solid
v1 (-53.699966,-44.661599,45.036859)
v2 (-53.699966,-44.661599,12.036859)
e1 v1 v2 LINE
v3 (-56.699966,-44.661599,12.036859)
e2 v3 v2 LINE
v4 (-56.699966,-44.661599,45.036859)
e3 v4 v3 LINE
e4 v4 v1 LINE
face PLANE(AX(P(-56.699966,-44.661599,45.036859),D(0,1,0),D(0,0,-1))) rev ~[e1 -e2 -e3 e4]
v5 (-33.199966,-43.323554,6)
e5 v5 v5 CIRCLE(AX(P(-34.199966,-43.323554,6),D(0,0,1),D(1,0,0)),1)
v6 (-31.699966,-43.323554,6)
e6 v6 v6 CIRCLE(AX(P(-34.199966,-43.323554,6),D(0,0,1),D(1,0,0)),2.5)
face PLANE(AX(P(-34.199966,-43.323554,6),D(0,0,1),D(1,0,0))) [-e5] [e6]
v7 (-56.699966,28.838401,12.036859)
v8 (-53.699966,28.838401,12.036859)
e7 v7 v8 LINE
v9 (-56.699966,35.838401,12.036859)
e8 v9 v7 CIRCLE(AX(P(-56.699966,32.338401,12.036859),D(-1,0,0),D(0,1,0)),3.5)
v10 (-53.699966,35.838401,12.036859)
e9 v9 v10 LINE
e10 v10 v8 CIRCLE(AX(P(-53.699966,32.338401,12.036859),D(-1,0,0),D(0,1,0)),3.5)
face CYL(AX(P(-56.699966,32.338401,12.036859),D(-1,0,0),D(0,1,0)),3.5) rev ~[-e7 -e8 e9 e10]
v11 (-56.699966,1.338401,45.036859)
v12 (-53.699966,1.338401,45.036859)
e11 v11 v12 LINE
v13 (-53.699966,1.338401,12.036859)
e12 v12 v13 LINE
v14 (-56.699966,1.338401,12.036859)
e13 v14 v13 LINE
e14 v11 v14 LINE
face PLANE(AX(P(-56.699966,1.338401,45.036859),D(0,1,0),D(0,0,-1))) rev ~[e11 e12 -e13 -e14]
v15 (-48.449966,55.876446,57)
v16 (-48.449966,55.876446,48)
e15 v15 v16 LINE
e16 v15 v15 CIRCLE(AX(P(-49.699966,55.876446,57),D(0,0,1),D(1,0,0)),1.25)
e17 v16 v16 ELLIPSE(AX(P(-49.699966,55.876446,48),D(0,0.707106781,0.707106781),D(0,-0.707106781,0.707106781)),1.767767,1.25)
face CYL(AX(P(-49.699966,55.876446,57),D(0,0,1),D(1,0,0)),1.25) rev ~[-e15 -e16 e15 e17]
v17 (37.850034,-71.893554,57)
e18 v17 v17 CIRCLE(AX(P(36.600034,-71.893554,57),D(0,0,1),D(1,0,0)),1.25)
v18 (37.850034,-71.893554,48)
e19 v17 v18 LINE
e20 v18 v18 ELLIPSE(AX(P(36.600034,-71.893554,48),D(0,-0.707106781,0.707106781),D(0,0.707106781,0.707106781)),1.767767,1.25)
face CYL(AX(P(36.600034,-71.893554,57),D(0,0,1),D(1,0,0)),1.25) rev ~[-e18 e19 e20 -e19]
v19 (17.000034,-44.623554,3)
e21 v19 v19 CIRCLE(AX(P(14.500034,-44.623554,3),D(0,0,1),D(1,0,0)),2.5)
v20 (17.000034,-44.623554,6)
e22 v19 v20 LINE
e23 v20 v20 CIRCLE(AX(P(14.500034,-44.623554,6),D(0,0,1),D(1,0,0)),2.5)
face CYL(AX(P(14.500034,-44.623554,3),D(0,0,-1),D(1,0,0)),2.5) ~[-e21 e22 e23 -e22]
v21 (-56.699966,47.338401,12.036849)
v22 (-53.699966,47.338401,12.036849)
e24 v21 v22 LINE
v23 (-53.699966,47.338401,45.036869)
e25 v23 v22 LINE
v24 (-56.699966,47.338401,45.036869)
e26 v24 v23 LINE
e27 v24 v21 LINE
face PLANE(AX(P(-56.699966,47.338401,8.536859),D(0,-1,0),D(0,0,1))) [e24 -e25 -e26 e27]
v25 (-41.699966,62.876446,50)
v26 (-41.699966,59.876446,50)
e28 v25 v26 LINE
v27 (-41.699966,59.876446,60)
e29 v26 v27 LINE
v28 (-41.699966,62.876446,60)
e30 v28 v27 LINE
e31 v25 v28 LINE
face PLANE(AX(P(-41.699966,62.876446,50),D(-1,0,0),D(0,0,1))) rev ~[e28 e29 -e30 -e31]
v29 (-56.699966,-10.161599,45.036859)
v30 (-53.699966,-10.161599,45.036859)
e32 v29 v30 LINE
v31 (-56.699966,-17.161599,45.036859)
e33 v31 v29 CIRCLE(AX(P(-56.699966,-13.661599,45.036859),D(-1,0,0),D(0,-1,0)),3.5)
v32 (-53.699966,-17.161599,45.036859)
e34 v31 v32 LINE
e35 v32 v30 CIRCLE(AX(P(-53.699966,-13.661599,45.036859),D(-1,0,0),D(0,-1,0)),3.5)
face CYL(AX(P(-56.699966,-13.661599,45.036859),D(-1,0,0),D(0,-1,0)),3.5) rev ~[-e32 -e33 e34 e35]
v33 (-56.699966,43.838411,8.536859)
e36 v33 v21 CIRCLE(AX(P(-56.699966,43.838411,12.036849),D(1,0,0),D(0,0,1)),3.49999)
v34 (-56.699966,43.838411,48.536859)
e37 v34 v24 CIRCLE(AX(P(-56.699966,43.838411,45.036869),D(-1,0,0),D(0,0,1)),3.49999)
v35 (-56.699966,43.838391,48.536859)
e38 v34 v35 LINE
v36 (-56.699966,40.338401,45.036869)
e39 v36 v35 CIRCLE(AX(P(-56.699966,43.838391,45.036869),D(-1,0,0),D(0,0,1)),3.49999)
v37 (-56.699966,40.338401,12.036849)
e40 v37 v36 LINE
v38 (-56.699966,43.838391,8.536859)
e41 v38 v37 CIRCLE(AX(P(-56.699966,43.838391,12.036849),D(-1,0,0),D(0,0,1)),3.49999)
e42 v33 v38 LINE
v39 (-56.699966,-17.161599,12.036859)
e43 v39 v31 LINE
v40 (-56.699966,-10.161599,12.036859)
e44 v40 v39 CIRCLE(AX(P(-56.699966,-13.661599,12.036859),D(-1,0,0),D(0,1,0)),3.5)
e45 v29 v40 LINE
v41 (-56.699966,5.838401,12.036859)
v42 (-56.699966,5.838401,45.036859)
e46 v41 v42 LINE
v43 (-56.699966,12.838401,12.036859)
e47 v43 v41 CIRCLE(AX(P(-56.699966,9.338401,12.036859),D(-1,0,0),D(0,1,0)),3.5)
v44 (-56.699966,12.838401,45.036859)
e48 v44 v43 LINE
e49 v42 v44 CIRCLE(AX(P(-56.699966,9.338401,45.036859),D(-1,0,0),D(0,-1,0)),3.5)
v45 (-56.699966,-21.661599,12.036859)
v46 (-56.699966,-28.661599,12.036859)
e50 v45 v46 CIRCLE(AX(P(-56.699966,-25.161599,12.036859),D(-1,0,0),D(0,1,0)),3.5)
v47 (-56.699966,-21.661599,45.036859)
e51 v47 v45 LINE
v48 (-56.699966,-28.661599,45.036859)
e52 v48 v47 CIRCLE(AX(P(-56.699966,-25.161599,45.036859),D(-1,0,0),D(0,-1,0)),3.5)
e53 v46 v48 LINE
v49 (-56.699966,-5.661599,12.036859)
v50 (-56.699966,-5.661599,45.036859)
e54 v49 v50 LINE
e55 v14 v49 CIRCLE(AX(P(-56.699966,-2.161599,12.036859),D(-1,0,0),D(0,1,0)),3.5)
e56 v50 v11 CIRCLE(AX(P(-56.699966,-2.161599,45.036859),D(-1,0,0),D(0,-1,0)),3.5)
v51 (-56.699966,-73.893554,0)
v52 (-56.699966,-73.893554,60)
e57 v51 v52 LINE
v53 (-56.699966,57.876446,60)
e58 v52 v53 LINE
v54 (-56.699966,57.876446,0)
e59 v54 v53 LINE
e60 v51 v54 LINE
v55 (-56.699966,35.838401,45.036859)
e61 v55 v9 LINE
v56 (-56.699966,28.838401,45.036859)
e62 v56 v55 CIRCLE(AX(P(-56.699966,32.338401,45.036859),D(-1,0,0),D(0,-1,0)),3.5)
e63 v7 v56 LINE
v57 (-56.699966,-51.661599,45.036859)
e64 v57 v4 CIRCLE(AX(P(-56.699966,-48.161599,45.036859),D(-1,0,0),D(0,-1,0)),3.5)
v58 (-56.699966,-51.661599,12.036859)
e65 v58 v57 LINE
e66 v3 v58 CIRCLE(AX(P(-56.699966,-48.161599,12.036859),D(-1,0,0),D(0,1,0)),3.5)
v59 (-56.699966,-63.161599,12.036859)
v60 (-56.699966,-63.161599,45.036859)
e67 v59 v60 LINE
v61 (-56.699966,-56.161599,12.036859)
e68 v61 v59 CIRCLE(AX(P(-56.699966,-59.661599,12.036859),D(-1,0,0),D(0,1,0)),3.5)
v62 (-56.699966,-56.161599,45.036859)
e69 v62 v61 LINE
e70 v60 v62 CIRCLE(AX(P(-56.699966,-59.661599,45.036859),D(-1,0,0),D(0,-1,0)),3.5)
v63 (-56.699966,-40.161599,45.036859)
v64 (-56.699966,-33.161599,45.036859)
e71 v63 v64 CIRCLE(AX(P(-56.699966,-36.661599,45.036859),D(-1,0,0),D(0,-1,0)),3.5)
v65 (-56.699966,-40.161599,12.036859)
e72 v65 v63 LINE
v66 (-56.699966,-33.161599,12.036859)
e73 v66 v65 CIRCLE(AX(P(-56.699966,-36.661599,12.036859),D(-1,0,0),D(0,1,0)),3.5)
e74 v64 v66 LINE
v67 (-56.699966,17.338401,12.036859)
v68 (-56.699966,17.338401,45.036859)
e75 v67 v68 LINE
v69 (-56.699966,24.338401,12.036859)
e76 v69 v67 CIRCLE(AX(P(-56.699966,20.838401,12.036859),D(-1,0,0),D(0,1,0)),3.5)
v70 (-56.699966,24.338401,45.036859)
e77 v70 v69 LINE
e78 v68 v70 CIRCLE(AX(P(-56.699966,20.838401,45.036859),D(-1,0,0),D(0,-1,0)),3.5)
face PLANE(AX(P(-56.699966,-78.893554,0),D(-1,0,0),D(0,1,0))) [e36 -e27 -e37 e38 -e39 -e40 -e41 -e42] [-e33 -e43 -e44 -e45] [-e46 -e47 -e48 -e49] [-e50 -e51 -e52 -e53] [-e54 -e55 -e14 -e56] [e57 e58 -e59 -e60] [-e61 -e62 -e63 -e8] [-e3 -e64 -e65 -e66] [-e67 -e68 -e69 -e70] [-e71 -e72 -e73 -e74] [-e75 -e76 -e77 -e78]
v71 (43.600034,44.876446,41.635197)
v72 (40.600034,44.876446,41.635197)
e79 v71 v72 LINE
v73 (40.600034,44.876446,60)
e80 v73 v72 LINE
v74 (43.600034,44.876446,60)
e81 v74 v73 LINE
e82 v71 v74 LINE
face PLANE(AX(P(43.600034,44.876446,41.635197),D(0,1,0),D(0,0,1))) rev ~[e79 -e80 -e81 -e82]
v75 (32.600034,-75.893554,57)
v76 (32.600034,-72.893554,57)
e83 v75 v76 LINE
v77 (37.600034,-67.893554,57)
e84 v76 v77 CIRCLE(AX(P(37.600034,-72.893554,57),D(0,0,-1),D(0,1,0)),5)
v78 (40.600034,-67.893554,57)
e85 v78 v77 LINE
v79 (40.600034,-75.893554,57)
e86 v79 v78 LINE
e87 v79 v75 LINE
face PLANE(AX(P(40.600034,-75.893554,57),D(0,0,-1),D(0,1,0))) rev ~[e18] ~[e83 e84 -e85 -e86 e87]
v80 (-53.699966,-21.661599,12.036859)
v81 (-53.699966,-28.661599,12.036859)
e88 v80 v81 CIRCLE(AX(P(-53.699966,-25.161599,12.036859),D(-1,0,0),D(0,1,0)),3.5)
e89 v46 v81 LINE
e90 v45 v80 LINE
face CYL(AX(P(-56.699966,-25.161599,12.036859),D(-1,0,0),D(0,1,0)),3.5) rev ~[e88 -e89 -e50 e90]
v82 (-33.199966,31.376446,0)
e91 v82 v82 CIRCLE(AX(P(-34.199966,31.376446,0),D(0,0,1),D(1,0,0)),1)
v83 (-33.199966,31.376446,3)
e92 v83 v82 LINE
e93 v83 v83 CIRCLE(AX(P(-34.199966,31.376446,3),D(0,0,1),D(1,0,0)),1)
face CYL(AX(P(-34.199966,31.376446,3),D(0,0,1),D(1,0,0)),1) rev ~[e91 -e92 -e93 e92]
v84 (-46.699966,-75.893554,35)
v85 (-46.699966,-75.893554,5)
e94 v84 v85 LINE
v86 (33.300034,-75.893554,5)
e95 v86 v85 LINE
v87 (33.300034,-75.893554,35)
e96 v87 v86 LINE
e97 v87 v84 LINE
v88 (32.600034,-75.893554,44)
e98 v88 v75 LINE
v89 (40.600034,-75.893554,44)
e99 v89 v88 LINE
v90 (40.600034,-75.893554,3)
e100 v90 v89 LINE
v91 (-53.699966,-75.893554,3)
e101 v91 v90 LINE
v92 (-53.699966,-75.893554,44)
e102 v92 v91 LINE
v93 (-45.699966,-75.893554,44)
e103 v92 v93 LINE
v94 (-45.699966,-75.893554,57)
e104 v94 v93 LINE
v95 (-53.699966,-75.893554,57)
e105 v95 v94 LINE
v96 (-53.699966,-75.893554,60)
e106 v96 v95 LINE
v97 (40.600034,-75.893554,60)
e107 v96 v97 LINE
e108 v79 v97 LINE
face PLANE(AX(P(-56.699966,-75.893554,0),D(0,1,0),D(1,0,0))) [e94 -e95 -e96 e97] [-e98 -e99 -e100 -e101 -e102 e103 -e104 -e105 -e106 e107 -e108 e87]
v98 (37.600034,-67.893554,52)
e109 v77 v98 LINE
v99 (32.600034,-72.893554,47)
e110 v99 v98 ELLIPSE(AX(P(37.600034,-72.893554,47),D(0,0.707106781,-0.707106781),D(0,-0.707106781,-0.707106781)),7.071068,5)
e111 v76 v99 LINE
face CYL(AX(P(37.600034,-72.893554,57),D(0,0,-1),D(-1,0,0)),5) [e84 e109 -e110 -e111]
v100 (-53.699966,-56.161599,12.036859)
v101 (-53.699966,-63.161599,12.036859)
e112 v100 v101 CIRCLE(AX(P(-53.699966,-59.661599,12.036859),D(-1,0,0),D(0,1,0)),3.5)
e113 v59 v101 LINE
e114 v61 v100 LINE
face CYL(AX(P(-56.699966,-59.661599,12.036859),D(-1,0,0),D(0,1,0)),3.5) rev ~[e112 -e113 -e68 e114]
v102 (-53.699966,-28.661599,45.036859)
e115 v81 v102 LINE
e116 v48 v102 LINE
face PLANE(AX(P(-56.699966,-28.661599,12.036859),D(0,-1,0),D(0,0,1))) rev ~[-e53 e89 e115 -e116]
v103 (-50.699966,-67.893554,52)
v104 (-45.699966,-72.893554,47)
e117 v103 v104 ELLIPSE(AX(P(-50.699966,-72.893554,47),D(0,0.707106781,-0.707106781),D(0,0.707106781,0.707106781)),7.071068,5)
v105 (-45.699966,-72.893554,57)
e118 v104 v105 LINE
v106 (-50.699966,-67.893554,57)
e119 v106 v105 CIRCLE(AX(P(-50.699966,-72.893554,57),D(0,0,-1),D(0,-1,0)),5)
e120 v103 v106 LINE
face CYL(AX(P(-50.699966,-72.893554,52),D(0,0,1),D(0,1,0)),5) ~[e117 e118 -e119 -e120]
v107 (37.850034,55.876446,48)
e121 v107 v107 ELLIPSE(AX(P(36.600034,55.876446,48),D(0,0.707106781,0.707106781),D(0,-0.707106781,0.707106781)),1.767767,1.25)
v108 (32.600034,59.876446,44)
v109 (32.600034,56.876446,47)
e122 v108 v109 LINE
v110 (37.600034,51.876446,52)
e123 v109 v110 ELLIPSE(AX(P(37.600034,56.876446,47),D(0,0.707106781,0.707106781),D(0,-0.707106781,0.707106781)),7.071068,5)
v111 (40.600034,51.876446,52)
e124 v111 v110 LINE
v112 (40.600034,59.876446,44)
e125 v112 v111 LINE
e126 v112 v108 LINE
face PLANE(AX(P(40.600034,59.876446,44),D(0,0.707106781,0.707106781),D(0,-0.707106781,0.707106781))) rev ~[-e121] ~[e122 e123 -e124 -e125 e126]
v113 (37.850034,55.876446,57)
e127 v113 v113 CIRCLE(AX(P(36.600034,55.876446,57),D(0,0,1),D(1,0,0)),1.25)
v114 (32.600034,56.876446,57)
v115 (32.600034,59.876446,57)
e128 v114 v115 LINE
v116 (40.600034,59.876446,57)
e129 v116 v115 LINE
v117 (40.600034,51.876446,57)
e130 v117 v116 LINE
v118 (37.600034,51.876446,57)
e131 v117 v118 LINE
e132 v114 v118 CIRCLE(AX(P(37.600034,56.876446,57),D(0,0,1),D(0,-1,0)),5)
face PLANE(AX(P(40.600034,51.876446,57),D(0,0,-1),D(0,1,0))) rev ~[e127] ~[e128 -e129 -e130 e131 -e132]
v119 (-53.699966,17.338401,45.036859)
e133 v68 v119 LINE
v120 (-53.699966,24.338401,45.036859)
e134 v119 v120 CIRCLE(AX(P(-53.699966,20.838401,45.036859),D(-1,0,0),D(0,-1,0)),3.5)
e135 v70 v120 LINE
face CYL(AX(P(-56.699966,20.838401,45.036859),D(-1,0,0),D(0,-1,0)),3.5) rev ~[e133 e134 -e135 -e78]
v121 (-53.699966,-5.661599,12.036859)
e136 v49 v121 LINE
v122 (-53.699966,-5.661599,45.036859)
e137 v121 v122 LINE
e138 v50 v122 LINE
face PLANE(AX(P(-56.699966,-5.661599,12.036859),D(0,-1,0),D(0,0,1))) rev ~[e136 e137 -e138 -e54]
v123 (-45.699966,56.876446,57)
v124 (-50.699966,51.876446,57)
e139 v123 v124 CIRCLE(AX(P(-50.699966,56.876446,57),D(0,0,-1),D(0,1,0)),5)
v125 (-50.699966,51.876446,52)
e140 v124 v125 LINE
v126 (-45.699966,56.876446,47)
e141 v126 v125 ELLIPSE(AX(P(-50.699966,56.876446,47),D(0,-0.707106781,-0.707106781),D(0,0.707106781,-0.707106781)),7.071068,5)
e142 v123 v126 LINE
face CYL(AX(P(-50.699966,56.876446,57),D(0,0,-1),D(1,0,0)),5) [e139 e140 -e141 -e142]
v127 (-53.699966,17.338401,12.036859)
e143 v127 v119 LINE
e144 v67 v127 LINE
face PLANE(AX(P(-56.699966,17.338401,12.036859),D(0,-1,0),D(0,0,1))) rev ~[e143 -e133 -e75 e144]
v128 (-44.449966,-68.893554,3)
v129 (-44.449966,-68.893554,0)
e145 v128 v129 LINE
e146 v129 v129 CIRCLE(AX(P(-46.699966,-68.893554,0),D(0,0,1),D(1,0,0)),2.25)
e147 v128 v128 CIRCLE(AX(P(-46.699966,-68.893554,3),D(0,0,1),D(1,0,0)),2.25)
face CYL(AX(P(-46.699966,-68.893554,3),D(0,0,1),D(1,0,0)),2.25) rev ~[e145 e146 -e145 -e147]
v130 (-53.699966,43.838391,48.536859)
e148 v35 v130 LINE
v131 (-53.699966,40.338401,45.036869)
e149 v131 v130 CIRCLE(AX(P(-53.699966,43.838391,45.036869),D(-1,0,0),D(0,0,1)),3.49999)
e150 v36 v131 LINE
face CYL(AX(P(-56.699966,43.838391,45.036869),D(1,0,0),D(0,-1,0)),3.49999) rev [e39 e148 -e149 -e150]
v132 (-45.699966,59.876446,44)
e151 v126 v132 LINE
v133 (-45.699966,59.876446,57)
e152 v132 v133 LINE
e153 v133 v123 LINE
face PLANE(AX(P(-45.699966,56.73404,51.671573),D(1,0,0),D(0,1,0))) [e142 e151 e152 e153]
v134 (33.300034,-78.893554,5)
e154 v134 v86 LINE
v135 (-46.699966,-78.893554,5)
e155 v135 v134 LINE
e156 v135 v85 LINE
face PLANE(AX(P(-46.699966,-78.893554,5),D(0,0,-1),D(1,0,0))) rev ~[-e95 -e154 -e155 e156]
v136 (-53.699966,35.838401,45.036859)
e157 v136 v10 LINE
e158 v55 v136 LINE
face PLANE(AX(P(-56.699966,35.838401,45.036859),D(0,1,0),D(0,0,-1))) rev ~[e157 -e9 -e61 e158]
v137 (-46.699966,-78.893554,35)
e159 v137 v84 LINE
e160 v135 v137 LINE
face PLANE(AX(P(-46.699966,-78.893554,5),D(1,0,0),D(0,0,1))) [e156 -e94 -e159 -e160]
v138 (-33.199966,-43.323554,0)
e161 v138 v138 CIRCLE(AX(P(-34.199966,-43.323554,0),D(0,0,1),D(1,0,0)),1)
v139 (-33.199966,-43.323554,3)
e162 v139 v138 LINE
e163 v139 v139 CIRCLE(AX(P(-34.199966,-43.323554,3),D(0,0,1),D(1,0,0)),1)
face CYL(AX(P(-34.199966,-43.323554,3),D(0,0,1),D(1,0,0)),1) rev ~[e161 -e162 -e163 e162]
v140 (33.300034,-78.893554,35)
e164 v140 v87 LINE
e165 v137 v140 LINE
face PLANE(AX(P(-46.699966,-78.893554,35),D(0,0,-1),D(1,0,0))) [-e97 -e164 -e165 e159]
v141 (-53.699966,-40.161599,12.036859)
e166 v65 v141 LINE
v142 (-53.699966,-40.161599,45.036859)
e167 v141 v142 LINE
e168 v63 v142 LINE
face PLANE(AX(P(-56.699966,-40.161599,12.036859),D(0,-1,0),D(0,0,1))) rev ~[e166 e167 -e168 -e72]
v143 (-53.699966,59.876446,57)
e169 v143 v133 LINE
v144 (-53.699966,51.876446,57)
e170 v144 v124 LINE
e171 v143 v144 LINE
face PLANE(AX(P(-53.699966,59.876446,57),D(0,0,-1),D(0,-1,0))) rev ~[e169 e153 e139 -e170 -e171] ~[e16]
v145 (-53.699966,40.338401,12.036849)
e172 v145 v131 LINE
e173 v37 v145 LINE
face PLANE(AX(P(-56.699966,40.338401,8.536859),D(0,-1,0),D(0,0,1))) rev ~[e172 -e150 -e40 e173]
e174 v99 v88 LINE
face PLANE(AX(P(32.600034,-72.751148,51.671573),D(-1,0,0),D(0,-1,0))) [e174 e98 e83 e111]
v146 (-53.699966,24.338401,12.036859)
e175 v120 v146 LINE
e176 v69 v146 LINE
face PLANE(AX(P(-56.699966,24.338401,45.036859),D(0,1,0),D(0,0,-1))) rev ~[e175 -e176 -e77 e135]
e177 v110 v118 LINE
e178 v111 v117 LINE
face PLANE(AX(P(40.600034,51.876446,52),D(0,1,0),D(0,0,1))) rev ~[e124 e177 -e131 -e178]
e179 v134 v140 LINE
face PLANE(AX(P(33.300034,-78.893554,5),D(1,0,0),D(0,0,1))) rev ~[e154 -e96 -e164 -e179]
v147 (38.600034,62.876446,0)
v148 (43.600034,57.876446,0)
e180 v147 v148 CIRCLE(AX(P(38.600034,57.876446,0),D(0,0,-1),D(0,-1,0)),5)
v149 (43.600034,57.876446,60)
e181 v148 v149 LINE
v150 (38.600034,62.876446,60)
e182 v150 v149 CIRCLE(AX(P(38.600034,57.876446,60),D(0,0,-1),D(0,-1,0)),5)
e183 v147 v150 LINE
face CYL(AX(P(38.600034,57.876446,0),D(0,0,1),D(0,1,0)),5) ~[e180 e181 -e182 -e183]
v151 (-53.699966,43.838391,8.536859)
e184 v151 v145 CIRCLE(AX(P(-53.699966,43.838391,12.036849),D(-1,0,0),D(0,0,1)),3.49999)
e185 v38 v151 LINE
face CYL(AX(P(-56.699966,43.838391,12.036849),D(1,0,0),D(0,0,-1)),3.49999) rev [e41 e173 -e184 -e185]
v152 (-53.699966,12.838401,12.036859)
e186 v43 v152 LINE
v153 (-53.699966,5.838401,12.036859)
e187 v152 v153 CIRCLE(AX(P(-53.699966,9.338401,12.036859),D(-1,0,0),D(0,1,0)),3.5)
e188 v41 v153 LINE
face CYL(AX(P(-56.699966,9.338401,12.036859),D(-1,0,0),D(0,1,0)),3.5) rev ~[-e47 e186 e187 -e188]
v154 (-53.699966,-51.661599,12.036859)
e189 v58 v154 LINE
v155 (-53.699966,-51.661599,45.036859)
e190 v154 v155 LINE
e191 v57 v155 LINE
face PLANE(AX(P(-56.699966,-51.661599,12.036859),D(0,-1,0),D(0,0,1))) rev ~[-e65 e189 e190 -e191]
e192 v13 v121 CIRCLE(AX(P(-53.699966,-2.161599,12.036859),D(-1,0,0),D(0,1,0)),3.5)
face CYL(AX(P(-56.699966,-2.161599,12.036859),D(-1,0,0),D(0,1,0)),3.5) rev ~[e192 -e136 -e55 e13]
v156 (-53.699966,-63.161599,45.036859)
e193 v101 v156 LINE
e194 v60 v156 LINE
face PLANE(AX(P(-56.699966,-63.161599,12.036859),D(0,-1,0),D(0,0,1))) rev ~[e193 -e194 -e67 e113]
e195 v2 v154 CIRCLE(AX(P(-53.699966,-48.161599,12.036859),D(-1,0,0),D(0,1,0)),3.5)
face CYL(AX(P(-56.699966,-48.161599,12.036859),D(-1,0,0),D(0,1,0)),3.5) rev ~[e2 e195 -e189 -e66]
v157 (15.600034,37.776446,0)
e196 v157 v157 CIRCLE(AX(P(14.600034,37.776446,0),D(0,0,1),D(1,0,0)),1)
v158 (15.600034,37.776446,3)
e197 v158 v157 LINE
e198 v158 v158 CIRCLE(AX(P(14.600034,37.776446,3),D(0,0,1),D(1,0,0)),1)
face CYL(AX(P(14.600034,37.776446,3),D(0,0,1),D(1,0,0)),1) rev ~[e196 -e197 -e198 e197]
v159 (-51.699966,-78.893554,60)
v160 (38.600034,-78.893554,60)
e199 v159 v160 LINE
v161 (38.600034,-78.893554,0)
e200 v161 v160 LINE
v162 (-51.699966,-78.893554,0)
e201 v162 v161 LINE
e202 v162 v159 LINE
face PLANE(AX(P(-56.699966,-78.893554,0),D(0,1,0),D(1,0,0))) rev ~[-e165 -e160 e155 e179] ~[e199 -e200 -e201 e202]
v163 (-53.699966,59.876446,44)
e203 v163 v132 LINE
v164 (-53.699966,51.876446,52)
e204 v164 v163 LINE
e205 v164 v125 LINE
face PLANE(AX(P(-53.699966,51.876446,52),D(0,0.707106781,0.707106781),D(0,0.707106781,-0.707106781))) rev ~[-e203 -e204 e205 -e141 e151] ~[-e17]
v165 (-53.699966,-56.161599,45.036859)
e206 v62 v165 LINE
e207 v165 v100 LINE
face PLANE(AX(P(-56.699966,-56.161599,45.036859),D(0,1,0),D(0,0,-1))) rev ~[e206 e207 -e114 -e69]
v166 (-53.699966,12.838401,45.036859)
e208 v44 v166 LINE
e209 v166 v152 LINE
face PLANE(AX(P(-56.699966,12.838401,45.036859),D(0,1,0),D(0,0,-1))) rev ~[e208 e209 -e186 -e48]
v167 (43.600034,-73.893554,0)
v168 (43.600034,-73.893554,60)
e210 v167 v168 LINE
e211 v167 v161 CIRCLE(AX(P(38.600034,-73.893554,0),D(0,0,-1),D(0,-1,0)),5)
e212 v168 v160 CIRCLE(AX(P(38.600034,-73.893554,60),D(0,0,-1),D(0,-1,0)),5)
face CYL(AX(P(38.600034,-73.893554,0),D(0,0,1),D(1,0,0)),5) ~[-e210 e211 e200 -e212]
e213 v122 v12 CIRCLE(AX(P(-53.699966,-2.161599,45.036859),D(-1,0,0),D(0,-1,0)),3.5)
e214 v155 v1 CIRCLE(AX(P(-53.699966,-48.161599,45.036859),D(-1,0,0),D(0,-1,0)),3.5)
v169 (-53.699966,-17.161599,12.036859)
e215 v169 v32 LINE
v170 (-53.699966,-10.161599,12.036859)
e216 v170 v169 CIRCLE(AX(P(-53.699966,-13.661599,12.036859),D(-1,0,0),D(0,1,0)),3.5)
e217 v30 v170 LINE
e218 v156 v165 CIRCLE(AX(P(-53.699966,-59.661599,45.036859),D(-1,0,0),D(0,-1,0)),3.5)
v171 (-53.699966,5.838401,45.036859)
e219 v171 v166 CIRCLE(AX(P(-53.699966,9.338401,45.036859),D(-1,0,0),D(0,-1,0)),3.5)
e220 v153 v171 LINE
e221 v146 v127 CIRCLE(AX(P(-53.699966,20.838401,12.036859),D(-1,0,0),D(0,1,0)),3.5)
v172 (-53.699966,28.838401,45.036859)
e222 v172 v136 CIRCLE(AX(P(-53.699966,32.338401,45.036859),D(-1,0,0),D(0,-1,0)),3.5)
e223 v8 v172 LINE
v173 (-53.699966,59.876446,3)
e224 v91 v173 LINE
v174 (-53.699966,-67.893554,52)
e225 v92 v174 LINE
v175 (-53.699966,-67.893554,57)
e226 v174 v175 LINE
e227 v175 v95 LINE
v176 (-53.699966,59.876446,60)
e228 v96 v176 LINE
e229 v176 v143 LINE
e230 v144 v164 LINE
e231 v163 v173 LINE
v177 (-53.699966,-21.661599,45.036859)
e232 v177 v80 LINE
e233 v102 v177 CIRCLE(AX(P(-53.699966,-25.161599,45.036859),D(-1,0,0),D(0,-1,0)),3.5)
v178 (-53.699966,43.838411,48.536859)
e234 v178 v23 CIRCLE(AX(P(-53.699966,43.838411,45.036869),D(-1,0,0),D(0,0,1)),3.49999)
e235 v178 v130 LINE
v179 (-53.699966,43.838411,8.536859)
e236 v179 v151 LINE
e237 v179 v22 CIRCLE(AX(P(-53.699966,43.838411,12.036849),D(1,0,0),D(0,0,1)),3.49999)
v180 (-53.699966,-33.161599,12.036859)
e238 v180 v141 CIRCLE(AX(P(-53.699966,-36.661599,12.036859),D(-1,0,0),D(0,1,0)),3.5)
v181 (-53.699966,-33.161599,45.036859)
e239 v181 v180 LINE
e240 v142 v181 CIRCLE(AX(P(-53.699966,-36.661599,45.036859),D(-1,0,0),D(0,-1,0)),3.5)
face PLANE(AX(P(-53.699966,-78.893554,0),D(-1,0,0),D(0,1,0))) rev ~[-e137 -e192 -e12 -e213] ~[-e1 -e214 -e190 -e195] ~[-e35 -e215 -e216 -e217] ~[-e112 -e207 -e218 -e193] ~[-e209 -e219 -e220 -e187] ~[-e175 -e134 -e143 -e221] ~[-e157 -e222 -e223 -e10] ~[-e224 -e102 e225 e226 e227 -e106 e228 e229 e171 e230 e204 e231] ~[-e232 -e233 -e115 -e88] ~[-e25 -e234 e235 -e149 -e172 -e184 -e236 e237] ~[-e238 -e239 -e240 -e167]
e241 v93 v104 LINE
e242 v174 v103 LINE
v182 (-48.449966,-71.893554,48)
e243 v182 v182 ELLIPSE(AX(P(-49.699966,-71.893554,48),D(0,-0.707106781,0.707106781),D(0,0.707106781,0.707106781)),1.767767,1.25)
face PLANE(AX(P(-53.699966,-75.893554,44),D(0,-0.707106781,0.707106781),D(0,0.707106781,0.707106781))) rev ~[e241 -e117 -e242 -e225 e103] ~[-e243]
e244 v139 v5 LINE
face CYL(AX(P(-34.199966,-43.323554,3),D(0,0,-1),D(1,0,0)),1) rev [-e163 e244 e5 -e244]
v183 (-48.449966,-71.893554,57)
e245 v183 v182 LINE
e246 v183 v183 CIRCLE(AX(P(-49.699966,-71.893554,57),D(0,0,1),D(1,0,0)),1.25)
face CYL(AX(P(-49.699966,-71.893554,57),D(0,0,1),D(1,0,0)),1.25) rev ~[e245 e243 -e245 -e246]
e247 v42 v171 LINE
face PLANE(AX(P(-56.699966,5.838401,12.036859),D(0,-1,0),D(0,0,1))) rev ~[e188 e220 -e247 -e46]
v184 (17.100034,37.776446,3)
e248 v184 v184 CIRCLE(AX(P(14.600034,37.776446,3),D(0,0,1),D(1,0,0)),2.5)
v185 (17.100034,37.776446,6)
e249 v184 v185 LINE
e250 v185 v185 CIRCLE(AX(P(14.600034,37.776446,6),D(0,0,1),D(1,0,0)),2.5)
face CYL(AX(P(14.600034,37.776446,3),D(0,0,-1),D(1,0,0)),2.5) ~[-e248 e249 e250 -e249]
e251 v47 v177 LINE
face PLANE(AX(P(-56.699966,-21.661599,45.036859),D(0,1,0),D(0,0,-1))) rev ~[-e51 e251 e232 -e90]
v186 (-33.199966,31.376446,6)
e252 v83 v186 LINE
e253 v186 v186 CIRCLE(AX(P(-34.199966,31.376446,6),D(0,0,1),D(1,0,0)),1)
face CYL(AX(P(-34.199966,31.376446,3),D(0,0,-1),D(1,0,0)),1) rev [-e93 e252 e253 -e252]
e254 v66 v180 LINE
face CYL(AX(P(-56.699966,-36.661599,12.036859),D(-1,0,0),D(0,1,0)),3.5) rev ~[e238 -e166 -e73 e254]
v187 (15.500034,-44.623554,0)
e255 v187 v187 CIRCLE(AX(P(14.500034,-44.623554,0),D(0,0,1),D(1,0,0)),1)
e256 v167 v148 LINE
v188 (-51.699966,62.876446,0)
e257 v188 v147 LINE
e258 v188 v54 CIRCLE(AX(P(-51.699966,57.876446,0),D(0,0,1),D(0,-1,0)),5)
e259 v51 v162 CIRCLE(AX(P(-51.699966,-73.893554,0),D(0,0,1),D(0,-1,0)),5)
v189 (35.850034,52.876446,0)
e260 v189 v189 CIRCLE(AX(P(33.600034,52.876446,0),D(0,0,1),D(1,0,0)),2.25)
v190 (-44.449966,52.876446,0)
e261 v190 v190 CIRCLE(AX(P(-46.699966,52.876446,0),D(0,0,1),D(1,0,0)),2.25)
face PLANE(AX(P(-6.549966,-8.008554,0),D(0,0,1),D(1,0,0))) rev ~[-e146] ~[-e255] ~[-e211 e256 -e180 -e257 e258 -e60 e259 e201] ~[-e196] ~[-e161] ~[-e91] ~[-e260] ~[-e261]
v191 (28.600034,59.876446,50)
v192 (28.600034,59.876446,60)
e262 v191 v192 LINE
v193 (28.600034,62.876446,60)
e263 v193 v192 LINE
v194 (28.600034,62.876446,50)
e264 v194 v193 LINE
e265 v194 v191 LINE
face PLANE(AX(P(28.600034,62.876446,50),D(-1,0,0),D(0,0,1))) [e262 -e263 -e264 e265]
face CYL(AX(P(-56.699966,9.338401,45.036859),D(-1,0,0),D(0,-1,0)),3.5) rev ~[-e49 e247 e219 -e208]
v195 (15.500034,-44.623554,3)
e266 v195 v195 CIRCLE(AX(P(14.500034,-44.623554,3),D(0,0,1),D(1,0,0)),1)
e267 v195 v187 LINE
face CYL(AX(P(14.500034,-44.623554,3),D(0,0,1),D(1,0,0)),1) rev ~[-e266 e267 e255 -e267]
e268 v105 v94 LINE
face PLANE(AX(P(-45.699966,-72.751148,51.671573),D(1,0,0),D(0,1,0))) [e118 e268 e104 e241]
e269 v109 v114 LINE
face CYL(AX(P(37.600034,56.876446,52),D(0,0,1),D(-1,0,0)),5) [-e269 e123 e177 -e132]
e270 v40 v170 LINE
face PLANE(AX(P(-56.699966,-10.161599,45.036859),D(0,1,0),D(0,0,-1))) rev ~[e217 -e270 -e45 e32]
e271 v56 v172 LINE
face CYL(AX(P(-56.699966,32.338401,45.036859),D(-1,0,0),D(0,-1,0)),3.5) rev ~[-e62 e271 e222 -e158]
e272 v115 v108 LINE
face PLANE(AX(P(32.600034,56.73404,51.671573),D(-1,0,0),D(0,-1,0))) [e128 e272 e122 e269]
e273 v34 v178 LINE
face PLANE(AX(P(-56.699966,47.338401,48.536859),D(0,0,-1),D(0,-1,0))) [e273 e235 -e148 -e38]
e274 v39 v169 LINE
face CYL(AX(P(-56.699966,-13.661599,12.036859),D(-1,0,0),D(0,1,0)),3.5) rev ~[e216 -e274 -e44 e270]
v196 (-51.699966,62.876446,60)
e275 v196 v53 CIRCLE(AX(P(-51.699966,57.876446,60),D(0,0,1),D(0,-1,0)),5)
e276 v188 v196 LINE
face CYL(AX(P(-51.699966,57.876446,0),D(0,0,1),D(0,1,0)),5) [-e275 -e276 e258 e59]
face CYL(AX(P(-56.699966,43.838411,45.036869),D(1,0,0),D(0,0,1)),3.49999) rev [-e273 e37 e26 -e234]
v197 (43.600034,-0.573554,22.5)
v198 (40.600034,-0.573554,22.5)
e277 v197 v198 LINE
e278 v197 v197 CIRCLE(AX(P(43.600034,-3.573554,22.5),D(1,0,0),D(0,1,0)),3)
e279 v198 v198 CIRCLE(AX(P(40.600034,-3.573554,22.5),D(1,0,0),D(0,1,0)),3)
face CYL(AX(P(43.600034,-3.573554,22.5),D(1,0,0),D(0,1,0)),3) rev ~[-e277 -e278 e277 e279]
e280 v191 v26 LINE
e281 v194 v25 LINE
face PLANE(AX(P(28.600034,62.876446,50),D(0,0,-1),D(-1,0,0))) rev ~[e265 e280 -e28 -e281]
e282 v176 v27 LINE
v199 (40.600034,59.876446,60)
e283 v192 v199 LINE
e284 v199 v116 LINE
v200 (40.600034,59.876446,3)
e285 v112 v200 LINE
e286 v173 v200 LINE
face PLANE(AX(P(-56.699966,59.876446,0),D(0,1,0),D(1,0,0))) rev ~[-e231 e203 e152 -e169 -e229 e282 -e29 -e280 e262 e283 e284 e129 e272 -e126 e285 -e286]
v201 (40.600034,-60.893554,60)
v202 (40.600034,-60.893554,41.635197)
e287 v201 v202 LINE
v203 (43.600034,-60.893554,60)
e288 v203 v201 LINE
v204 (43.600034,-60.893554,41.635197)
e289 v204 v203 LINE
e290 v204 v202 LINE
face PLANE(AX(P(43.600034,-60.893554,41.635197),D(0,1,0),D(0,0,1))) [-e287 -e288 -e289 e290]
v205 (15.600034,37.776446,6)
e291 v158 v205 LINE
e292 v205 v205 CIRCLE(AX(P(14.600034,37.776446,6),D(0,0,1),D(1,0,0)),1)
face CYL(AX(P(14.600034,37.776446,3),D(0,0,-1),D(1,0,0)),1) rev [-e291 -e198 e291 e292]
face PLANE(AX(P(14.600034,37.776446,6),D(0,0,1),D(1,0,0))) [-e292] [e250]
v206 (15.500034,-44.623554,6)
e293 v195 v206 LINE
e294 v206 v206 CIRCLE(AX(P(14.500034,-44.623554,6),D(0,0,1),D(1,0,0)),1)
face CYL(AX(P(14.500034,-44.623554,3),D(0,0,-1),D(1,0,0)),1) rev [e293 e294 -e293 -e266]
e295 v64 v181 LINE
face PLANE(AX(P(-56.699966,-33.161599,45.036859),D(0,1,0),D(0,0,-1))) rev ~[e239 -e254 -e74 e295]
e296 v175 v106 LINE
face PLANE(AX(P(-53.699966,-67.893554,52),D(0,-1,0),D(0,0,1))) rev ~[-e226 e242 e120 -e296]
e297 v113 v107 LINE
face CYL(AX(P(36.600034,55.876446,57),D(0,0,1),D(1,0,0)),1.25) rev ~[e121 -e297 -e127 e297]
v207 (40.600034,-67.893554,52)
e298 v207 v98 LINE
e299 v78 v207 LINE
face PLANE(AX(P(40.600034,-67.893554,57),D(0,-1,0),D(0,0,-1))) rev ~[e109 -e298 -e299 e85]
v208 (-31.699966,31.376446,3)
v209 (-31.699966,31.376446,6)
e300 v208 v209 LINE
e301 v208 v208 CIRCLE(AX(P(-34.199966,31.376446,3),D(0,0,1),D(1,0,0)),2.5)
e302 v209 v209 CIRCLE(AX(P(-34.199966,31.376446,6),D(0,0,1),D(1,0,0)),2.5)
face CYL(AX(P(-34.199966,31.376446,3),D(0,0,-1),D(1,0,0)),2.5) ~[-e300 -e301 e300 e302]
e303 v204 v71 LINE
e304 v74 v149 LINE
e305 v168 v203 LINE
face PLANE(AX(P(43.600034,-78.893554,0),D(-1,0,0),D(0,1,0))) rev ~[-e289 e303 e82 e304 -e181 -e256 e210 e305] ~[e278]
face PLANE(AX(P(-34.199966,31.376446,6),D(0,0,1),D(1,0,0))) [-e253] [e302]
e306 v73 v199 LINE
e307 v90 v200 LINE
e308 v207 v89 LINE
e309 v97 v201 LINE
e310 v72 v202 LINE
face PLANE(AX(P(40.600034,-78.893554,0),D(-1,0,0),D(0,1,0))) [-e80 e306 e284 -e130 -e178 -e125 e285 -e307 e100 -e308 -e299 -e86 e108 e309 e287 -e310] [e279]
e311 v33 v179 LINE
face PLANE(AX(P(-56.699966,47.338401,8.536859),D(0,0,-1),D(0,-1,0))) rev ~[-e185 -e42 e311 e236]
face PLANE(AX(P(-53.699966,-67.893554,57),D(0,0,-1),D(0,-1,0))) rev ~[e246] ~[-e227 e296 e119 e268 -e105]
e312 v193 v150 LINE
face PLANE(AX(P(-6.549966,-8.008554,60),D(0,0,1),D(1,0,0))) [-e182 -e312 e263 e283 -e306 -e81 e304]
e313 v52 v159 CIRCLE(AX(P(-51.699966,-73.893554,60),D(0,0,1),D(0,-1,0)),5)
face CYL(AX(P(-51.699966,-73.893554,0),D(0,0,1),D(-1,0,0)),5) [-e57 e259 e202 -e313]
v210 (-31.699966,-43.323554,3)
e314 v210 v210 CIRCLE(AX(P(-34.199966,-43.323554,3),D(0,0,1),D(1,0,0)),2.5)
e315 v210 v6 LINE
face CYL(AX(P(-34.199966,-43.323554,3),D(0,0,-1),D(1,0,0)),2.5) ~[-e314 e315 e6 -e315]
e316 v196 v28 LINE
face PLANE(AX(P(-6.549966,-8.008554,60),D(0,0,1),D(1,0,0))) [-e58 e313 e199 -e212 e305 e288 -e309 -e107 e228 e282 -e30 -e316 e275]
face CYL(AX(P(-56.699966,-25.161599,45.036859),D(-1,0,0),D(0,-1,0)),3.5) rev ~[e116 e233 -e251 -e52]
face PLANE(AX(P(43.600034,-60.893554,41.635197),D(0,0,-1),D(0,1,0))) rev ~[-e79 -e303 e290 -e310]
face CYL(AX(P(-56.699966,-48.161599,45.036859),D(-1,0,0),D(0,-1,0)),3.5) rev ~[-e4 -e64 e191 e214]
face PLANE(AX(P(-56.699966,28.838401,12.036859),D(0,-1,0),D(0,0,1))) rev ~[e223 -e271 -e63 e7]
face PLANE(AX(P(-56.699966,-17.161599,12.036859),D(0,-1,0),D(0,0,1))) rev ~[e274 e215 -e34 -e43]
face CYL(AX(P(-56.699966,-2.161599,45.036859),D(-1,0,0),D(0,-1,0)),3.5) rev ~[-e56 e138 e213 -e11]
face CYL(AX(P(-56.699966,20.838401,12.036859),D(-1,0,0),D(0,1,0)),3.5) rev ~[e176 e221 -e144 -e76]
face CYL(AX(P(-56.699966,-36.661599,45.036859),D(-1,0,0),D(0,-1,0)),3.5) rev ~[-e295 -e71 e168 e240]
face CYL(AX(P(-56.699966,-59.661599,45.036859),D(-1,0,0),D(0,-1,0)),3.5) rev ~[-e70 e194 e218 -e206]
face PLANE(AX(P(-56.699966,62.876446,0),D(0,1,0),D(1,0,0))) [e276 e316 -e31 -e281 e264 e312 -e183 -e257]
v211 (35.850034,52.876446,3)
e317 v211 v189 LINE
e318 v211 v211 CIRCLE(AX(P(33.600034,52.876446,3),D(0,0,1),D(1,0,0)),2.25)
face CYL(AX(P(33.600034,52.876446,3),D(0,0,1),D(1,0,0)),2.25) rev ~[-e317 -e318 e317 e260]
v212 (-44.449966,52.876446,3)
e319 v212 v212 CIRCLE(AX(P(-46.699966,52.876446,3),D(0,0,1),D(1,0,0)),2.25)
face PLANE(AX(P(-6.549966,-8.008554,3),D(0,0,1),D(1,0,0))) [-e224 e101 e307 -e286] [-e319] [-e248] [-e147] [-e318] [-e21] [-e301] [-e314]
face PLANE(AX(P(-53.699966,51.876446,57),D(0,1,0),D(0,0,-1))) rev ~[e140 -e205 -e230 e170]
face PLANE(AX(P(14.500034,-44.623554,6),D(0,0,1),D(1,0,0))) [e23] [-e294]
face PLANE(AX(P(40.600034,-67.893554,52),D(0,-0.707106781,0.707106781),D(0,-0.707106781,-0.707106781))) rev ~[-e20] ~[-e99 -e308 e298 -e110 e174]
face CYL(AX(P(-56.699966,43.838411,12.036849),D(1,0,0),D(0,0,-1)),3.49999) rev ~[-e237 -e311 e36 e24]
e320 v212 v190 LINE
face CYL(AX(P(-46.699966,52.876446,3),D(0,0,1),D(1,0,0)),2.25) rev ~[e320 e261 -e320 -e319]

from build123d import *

# Parameters (mm, degrees)
F1_W           = 100.3
F1_H           = 141.77
F2_DEPTH       = 60
F3_T           = -3
F4_R           = 2
F5_DEPTH       = 25
F6_W           = 80
F6_H           = 30
F7_DEPTH       = 25
F8_W           = 105.77
F8_H           = 18.364803344
F9_DEPTH       = 25
F10_W          = 70.3
F10_H          = 10
F11_DEPTH      = 25
F12_R          = 2.25
F13_DEPTH      = 25
F15_DEPTH      = 8
F17_DEPTH      = 8
F19_R          = 1.25
F18_R          = 1.25
F20_R          = 1.25
F21_R          = 1.25
F22_DEPTH      = 25
F23_R          = 5
F24_R          = 5
F25_R          = 3
F26_DEPTH      = 25
F27_W          = 7
F27_H          = 40
F28_DEPTH      = 25
F29_R          = 3.49999
F31_DEPTH      = 25
F32_R          = 2.5
F32_R_2        = 1
F33_DEPTH      = 3
F33_DEPTH_BACK = 3


# Not quite as in the source:
# - a fillet or chamfer is up to 0.001 mm smaller than in the source, because OpenCascade refuses the exact size


with BuildPart() as f2:
    # F1 (on face) → F2 (new body)
    with BuildSketch(Plane.XY):
        with Locations((-6.5499655962, -8.0085539126)):
            Rectangle(F1_W, F1_H)
    extrude(amount=F2_DEPTH)

    # F3
    f3_openings = [f2.faces().sort_by_distance(p)[0] for p in [
        (-6.549966, -8.008554, 60),
    ]]
    offset(amount=F3_T, openings=f3_openings)

    # F4 (on face) → F5 (cut)
    with BuildSketch(Plane.XY.offset(3)):
        with Locations((-34.1999655962, 31.3764460874)):
            Circle(F4_R)
        with Locations((14.6000344038, 37.7764460874)):
            Circle(F4_R)
        with Locations((14.5000344038, -44.6235539126)):
            Circle(F4_R)
        with Locations((-34.1999655962, -43.3235539126)):
            Circle(F4_R)
    extrude(amount=-F5_DEPTH, mode=Mode.SUBTRACT)

    # F6 (on face) → F7 (cut)
    with BuildSketch(Plane.XZ.offset(78.8935539126)):
        with Locations((-6.6999655962, 20)):
            Rectangle(F6_W, F6_H)
    extrude(amount=-F7_DEPTH, mode=Mode.SUBTRACT)

    # F8 (on face) → F9 (cut)
    with BuildSketch(Plane.YZ.offset(43.6000344038)):
        with Locations((-8.0085539126, 50.817598328)):
            Rectangle(F8_W, F8_H)
    extrude(amount=-F9_DEPTH, mode=Mode.SUBTRACT)

    # F10 (on face) → F11 (cut)
    with BuildSketch(Plane(origin=(0, 62.8764460874, 0), x_dir=(-1, 0, 0), z_dir=(0, 1, 0))):
        with Locations((6.5499655962, 55)):
            Rectangle(F10_W, F10_H)
    extrude(amount=-F11_DEPTH, mode=Mode.SUBTRACT)

    # F12 (on face) → F13 (cut)
    with BuildSketch(Plane.XY.offset(3)):
        with Locations((-46.6999655962, 52.8764460874)):
            Circle(F12_R)
        with Locations((33.6000344038, 52.8764460874)):
            Circle(F12_R)
        with Locations((-46.6999655962, -68.8935539126)):
            Circle(F12_R)
    extrude(amount=-F13_DEPTH, mode=Mode.SUBTRACT)

    # F14 (on face) → F15 (join)
    with BuildSketch(Plane.YZ.offset(-53.6999655962)):
        Polygon((59.8764460874, 44), (59.8764460874, 57), (51.8764460874, 57), (51.8764460874, 52), align=None)
        Polygon((-75.8935539126, 57), (-75.8935539126, 44), (-67.8935539126, 52), (-67.8935539126, 57), align=None)
    extrude(amount=F15_DEPTH)

    # F16 (on face) → F17 (join)
    with BuildSketch(Plane(origin=(40.6000344038, 0, 0), x_dir=(0, -1, 0), z_dir=(-1, 0, 0))):
        Polygon((-59.8764460874, 57), (-59.8764460874, 44), (-51.8764460874, 52), (-51.8764460874, 57), align=None)
        Polygon((75.8935539126, 57), (67.8935539126, 57), (67.8935539126, 52), (75.8935539126, 44), align=None)
    extrude(amount=F17_DEPTH)

    # F19 (on face) + F18 (on face) + F20 (on face) + F21 (on face) → F22 (cut)
    with BuildSketch(Plane.XY.offset(57)):
        with Locations((-49.6999655962, 55.8764460874)):
            Circle(F19_R)
    with BuildSketch(Plane.XY.offset(57)):
        with Locations((36.6000344038, 55.8764460874)):
            Circle(F18_R)
    with BuildSketch(Plane.XY.offset(57)):
        with Locations((-49.6999655962, -71.8935539126)):
            Circle(F20_R)
    with BuildSketch(Plane.XY.offset(57)):
        with Locations((36.6000344038, -71.8935539126)):
            Circle(F21_R)
    extrude(amount=-F22_DEPTH, mode=Mode.SUBTRACT)

    # F23
    f23_edges = [f2.edges().sort_by_distance(p)[0] for p in [
        (-45.699966, 51.876446, 54.5),
        (32.600034, 51.876446, 54.5),
        (-45.699966, -67.893554, 54.5),
        (32.600034, -67.893554, 54.5),
    ]]
    fillet(f23_edges, radius=F23_R)

    # F24
    f24_edges = [f2.edges().sort_by_distance(p)[0] for p in [
        (43.600034, 62.876446, 30),
        (-56.699966, 62.876446, 30),
        (-56.699966, -78.893554, 30),
        (43.600034, -78.893554, 30),
    ]]
    fillet(f24_edges, radius=F24_R)

    # F25 (on face) → F26 (cut)
    with BuildSketch(Plane.YZ.offset(43.6000344038)):
        with Locations((-3.5735539126, 22.5)):
            Circle(F25_R)
    extrude(amount=-F26_DEPTH, mode=Mode.SUBTRACT)

    # F27 (on face) → F28 (cut)
    with BuildSketch(Plane(origin=(-56.6999655962, 0, 0), x_dir=(0, -1, 0), z_dir=(-1, 0, 0))):
        with Locations((-43.8384013922, 28.5368594155)):
            Rectangle(F27_W, F27_H)
    extrude(amount=-F28_DEPTH, mode=Mode.SUBTRACT)

    # F29 (radius 3.5 in the source; OpenCascade refuses exactly that, so slightly less here)
    f29_edges = [f2.edges().sort_by_distance(p)[0] for p in [
        (-55.199966, 40.338401, 48.536859),
        (-55.199966, 47.338401, 48.536859),
        (-55.199966, 40.338401, 8.536859),
        (-55.199966, 47.338401, 8.536859),
    ]]
    fillet(f29_edges, radius=F29_R)

    # F30 (on face) → F31 (cut)
    with BuildSketch(Plane(origin=(-56.6999655962, 0, 0), x_dir=(0, -1, 0), z_dir=(-1, 0, 0))):
        with BuildLine():
            Line((-40.3384013922, 12.0368594155), (-40.3384013922, 45.0368594155))
            ThreePointArc((-40.3384013922, 45.0368594155), (-43.8384013922, 48.5368594155), (-47.3384013922, 45.0368594155))
            Line((-47.3384013922, 45.0368594155), (-47.3384013922, 12.0368594155))
            ThreePointArc((-47.3384013922, 12.0368594155), (-43.8384013922, 8.5368594155), (-40.3384013922, 12.0368594155))
        make_face()
        with BuildLine():
            Line((-28.8384013922, 12.0368594155), (-28.8384013922, 45.0368594155))
            ThreePointArc((-28.8384013922, 45.0368594155), (-32.3384013922, 48.5368594155), (-35.8384013922, 45.0368594155))
            Line((-35.8384013922, 45.0368594155), (-35.8384013922, 12.0368594155))
            ThreePointArc((-35.8384013922, 12.0368594155), (-32.3384013922, 8.5368594155), (-28.8384013922, 12.0368594155))
        make_face()
        with BuildLine():
            Line((-17.3384013922, 12.0368594155), (-17.3384013922, 45.0368594155))
            ThreePointArc((-17.3384013922, 45.0368594155), (-20.8384013922, 48.5368594155), (-24.3384013922, 45.0368594155))
            Line((-24.3384013922, 45.0368594155), (-24.3384013922, 12.0368594155))
            ThreePointArc((-24.3384013922, 12.0368594155), (-20.8384013922, 8.5368594155), (-17.3384013922, 12.0368594155))
        make_face()
        with BuildLine():
            Line((-5.8384013922, 12.0368594155), (-5.8384013922, 45.0368594155))
            ThreePointArc((-5.8384013922, 45.0368594155), (-9.3384013922, 48.5368594155), (-12.8384013922, 45.0368594155))
            Line((-12.8384013922, 45.0368594155), (-12.8384013922, 12.0368594155))
            ThreePointArc((-12.8384013922, 12.0368594155), (-9.3384013922, 8.5368594155), (-5.8384013922, 12.0368594155))
        make_face()
        with BuildLine():
            Line((5.6615986078, 12.0368594155), (5.6615986078, 45.0368594155))
            ThreePointArc((5.6615986078, 45.0368594155), (2.1615986078, 48.5368594155), (-1.3384013922, 45.0368594155))
            Line((-1.3384013922, 45.0368594155), (-1.3384013922, 12.0368594155))
            ThreePointArc((-1.3384013922, 12.0368594155), (2.1615986078, 8.5368594155), (5.6615986078, 12.0368594155))
        make_face()
        with BuildLine():
            Line((17.1615986078, 12.0368594155), (17.1615986078, 45.0368594155))
            ThreePointArc((17.1615986078, 45.0368594155), (13.6615986078, 48.5368594155), (10.1615986078, 45.0368594155))
            Line((10.1615986078, 45.0368594155), (10.1615986078, 12.0368594155))
            ThreePointArc((10.1615986078, 12.0368594155), (13.6615986078, 8.5368594155), (17.1615986078, 12.0368594155))
        make_face()
        with BuildLine():
            Line((28.6615986078, 12.0368594155), (28.6615986078, 45.0368594155))
            ThreePointArc((28.6615986078, 45.0368594155), (25.1615986078, 48.5368594155), (21.6615986078, 45.0368594155))
            Line((21.6615986078, 45.0368594155), (21.6615986078, 12.0368594155))
            ThreePointArc((21.6615986078, 12.0368594155), (25.1615986078, 8.5368594155), (28.6615986078, 12.0368594155))
        make_face()
        with BuildLine():
            Line((40.1615986078, 12.0368594155), (40.1615986078, 45.0368594155))
            ThreePointArc((40.1615986078, 45.0368594155), (36.6615986078, 48.5368594155), (33.1615986078, 45.0368594155))
            Line((33.1615986078, 45.0368594155), (33.1615986078, 12.0368594155))
            ThreePointArc((33.1615986078, 12.0368594155), (36.6615986078, 8.5368594155), (40.1615986078, 12.0368594155))
        make_face()
        with BuildLine():
            Line((51.6615986078, 12.0368594155), (51.6615986078, 45.0368594155))
            ThreePointArc((51.6615986078, 45.0368594155), (48.1615986078, 48.5368594155), (44.6615986078, 45.0368594155))
            Line((44.6615986078, 45.0368594155), (44.6615986078, 12.0368594155))
            ThreePointArc((44.6615986078, 12.0368594155), (48.1615986078, 8.5368594155), (51.6615986078, 12.0368594155))
        make_face()
        with BuildLine():
            Line((63.1615986078, 12.0368594155), (63.1615986078, 45.0368594155))
            ThreePointArc((63.1615986078, 45.0368594155), (59.6615986078, 48.5368594155), (56.1615986078, 45.0368594155))
            Line((56.1615986078, 45.0368594155), (56.1615986078, 12.0368594155))
            ThreePointArc((56.1615986078, 12.0368594155), (59.6615986078, 8.5368594155), (63.1615986078, 12.0368594155))
        make_face()
    extrude(amount=-F31_DEPTH, mode=Mode.SUBTRACT)

    # F32 (on face) → F33 (join, two sides)
    with BuildSketch(Plane.XY.offset(3)) as f33_sk:
        with Locations((14.6000344038, 37.7764460874)):
            Circle(F32_R)
        with Locations((14.6000344038, 37.7764460874)):
            Circle(F32_R_2, mode=Mode.SUBTRACT)
        with Locations((14.5000344038, -44.6235539126)):
            Circle(F32_R)
        with Locations((14.5000344038, -44.6235539126)):
            Circle(F32_R_2, mode=Mode.SUBTRACT)
        with Locations((-34.1999655962, -43.3235539126)):
            Circle(F32_R)
        with Locations((-34.1999655962, -43.3235539126)):
            Circle(F32_R_2, mode=Mode.SUBTRACT)
        with Locations((-34.1999655962, 31.3764460874)):
            Circle(F32_R)
        with Locations((-34.1999655962, 31.3764460874)):
            Circle(F32_R_2, mode=Mode.SUBTRACT)
    extrude(amount=F33_DEPTH)
    extrude(f33_sk.sketch, amount=-F33_DEPTH_BACK)


solid = f2.part
